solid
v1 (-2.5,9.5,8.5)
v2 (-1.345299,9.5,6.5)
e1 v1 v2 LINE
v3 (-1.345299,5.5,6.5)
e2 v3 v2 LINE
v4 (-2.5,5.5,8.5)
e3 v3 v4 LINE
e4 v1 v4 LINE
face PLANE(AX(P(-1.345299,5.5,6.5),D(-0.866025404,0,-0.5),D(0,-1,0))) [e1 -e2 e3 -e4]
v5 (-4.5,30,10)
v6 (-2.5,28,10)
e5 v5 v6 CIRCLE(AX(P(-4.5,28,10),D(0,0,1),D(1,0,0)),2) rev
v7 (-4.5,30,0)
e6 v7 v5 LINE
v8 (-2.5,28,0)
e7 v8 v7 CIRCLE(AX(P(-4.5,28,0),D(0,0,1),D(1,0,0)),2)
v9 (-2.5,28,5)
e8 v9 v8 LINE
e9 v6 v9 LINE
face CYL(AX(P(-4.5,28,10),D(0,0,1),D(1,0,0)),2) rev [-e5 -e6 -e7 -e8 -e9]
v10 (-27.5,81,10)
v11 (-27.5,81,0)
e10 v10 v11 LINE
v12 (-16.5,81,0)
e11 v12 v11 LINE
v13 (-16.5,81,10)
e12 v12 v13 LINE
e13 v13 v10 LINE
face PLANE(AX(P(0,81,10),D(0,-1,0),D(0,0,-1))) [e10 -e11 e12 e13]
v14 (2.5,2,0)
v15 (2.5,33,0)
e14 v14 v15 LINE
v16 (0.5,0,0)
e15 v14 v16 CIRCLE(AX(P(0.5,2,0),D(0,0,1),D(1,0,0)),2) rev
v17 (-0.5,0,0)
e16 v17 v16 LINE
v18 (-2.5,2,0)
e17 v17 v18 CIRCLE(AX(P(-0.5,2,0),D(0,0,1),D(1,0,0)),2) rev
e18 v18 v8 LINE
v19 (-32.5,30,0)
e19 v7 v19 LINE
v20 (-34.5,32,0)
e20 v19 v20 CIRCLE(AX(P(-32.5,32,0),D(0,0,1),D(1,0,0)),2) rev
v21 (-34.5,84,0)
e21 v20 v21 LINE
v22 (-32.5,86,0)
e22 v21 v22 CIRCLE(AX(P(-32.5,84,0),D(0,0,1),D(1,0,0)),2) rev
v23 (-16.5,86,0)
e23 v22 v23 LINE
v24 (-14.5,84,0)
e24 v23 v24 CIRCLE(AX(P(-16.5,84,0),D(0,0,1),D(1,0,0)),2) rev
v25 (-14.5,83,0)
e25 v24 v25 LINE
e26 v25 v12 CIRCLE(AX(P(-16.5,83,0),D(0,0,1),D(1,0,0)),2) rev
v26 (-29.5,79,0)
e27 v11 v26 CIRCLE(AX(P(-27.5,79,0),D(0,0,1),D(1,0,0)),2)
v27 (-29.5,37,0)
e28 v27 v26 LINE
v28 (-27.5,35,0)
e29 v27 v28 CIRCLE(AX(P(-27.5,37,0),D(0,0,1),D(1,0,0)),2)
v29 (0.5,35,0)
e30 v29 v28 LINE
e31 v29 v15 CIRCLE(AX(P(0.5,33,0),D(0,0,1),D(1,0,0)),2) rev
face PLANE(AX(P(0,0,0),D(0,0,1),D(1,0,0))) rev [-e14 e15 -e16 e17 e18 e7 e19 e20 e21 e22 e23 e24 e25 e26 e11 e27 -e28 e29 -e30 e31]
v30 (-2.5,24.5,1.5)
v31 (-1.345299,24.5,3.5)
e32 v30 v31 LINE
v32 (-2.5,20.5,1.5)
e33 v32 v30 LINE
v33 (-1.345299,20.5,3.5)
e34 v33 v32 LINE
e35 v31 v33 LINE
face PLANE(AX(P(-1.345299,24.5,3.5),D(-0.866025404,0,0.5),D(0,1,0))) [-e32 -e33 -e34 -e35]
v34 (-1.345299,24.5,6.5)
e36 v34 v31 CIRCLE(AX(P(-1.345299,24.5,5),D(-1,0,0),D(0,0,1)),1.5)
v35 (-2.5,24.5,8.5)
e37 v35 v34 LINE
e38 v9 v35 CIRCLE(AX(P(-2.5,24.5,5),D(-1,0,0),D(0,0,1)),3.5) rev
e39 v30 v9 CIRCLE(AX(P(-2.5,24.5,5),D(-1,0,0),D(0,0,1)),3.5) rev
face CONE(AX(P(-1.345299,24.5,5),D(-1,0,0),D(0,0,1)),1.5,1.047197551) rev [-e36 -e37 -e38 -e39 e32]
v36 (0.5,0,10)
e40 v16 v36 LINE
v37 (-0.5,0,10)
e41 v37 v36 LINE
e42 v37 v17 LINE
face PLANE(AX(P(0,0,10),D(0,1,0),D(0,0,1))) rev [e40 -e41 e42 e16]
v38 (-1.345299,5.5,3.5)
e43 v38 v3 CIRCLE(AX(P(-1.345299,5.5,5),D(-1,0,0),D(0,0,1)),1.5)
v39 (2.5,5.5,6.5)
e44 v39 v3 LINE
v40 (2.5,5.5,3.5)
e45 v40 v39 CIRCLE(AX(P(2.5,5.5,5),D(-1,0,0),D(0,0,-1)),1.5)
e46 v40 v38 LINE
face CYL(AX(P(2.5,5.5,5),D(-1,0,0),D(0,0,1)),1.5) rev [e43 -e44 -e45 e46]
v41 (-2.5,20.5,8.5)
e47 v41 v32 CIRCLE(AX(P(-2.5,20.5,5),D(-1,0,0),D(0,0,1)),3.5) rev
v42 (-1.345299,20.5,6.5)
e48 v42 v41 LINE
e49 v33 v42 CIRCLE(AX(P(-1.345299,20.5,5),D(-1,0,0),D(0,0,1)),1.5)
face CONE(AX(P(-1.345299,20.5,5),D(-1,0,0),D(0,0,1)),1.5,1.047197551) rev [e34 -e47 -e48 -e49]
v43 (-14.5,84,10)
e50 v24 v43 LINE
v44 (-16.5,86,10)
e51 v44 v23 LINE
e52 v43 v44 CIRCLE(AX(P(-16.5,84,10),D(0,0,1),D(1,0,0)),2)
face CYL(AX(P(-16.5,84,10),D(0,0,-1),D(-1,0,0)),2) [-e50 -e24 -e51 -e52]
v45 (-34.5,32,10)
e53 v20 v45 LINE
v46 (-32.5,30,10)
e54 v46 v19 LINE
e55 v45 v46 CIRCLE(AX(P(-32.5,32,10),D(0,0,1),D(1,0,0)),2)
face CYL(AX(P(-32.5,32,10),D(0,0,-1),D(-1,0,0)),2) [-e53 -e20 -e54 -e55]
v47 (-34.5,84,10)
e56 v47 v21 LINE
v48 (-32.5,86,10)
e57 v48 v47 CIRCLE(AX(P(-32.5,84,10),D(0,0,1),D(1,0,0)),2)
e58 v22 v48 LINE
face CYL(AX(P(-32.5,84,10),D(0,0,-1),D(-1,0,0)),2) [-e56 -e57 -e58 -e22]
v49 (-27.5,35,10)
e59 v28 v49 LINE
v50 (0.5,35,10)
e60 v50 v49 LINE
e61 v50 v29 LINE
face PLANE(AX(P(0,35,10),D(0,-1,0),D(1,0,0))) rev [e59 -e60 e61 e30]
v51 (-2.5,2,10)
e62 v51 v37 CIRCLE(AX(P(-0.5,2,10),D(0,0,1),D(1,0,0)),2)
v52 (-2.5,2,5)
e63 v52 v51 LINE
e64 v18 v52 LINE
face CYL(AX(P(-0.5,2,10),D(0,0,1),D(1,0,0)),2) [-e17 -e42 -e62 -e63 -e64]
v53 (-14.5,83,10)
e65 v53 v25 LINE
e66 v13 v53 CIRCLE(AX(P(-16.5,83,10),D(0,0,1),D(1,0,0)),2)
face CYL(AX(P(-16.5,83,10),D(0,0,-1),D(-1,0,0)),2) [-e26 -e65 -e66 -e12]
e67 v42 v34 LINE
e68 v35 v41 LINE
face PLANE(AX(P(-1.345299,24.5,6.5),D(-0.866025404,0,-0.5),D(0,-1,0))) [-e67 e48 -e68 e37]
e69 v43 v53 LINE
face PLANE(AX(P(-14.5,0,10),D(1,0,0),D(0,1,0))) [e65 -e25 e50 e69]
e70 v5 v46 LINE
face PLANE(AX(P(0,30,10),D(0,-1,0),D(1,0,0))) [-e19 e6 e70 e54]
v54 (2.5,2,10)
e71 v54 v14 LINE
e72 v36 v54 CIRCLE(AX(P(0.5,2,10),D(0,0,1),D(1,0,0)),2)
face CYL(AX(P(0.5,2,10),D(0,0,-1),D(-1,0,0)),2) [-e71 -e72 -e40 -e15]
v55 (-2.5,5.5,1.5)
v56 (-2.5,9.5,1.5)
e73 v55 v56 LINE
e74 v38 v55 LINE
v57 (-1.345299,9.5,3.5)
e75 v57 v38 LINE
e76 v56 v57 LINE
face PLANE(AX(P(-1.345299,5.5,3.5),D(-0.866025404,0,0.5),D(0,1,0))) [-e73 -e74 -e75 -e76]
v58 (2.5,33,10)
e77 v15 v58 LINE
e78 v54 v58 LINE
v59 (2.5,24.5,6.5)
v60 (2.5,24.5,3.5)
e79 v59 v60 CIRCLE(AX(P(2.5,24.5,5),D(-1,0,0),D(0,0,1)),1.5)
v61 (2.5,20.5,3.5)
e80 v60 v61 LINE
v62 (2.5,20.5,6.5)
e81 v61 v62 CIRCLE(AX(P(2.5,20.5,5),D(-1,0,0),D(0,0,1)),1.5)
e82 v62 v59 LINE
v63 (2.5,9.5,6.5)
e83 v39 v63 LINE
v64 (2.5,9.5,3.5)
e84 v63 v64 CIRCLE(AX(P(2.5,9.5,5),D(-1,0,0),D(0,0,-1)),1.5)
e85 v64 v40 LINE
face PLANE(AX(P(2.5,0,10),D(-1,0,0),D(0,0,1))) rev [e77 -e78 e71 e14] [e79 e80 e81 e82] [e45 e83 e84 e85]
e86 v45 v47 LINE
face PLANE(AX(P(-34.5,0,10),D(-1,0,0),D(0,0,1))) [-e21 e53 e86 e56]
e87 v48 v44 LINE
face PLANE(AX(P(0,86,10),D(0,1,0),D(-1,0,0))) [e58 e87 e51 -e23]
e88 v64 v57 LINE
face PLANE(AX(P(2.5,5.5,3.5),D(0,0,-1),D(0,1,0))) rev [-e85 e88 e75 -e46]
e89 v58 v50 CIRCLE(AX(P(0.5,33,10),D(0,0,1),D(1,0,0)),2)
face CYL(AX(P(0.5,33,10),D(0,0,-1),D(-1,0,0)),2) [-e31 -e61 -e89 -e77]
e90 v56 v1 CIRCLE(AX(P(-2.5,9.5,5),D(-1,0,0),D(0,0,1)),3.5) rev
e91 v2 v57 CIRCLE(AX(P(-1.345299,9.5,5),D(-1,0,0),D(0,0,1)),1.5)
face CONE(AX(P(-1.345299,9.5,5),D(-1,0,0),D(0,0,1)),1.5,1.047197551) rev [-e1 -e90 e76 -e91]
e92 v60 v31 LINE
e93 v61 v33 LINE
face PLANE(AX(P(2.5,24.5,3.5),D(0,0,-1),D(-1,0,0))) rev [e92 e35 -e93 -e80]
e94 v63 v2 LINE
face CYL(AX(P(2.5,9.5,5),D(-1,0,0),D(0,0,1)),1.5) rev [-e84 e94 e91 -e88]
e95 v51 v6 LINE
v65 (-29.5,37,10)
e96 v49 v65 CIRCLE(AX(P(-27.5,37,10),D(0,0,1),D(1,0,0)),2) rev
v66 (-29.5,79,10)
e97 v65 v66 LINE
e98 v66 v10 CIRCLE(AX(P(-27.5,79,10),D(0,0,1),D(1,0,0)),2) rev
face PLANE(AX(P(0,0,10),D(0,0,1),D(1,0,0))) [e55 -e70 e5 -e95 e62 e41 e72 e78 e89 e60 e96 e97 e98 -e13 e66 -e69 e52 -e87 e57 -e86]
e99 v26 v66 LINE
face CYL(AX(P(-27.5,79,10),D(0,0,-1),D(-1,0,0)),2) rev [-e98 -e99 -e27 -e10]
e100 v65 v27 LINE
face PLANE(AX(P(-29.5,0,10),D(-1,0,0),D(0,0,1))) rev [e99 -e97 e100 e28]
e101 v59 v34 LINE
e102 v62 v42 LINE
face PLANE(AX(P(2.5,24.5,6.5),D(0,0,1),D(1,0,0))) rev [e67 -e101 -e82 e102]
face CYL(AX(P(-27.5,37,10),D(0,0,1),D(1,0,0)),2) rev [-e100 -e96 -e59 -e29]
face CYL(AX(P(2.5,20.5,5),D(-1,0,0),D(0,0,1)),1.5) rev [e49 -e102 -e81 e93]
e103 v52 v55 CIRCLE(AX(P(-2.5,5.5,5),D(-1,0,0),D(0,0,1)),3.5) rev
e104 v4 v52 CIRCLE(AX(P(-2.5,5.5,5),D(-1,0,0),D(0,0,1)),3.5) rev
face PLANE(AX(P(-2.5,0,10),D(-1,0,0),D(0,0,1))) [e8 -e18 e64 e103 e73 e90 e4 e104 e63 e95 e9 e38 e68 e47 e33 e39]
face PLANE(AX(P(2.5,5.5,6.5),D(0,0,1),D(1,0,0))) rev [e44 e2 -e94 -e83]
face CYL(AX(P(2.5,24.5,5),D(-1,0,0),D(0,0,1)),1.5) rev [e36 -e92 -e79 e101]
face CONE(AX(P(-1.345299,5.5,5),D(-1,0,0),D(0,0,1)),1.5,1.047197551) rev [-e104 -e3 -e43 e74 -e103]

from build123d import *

# Parameters (mm, degrees)
BOSS_EXTRUDE1_DEPTH     = 10
CUT_EXTRUDE1_DEPTH      = 93.303846074
CUT_EXTRUDE1_DEPTH_BACK = 93.303846074
CHAMFER2_SIZE           = 2
CHAMFER2_SIZE2          = 1.154700538
FILLET1_R               = 2


with BuildPart() as part:
    # Sketch1 → Boss-Extrude1 (new body)
    with BuildSketch(Plane.XY):
        Polygon((-14.5, 81), (-29.5, 81), (-29.5, 35), (2.5, 35), (2.5, 0), (-2.5, 0), (-2.5, 30), (-34.5, 30), (-34.5, 86), (-14.5, 86), align=None)
    extrude(amount=BOSS_EXTRUDE1_DEPTH)

    # Sketch3 → Cut-Extrude1 (cut, two sides: drawn at the far end of the back side and taken through both)
    with BuildSketch(Plane.ZY.offset(2.5).offset(-CUT_EXTRUDE1_DEPTH_BACK)):
        with BuildLine():
            Line((6.5, 24.5), (6.5, 20.5))
            ThreePointArc((6.5, 20.5), (5, 19), (3.5, 20.5))
            Line((3.5, 20.5), (3.5, 24.5))
            ThreePointArc((3.5, 24.5), (5, 26), (6.5, 24.5))
        make_face()
        with BuildLine():
            Line((6.5, 5.5), (6.5, 9.5))
            ThreePointArc((6.5, 9.5), (5, 11), (3.5, 9.5))
            Line((3.5, 9.5), (3.5, 5.5))
            ThreePointArc((3.5, 5.5), (5, 4), (6.5, 5.5))
        make_face()
    extrude(amount=CUT_EXTRUDE1_DEPTH + CUT_EXTRUDE1_DEPTH_BACK, mode=Mode.SUBTRACT)

    # Chamfer2
    chamfer2_edges = [part.edges().sort_by_distance(p)[0] for p in [
        (-2.5, 26, 5),
        (-2.5, 22.5, 6.5),
        (-2.5, 19, 5),
        (-2.5, 22.5, 3.5),
        (-2.5, 4, 5),
        (-2.5, 7.5, 3.5),
        (-2.5, 11, 5),
        (-2.5, 7.5, 6.5),
    ]]
    chamfer2_side = [part.faces().sort_by_distance(p)[0] for p in [
        (-2.5, 15, 5),
    ]]
    chamfer(chamfer2_edges, length=CHAMFER2_SIZE, length2=CHAMFER2_SIZE2, reference=chamfer2_side[0])

    # Fillet1
    fillet1_edges = [part.edges().sort_by_distance(p)[0] for p in [
        (-29.5, 81, 5),
        (-29.5, 35, 5),
        (2.5, 35, 5),
        (2.5, 0, 5),
        (-2.5, 0, 5),
        (-2.5, 30, 5),
        (-34.5, 30, 5),
        (-34.5, 86, 5),
        (-14.5, 86, 5),
        (-14.5, 81, 5),
    ]]
    fillet(fillet1_edges, radius=FILLET1_R - 0.0001)  # a hair under: the kernel refuses the full size


solid = part.part
